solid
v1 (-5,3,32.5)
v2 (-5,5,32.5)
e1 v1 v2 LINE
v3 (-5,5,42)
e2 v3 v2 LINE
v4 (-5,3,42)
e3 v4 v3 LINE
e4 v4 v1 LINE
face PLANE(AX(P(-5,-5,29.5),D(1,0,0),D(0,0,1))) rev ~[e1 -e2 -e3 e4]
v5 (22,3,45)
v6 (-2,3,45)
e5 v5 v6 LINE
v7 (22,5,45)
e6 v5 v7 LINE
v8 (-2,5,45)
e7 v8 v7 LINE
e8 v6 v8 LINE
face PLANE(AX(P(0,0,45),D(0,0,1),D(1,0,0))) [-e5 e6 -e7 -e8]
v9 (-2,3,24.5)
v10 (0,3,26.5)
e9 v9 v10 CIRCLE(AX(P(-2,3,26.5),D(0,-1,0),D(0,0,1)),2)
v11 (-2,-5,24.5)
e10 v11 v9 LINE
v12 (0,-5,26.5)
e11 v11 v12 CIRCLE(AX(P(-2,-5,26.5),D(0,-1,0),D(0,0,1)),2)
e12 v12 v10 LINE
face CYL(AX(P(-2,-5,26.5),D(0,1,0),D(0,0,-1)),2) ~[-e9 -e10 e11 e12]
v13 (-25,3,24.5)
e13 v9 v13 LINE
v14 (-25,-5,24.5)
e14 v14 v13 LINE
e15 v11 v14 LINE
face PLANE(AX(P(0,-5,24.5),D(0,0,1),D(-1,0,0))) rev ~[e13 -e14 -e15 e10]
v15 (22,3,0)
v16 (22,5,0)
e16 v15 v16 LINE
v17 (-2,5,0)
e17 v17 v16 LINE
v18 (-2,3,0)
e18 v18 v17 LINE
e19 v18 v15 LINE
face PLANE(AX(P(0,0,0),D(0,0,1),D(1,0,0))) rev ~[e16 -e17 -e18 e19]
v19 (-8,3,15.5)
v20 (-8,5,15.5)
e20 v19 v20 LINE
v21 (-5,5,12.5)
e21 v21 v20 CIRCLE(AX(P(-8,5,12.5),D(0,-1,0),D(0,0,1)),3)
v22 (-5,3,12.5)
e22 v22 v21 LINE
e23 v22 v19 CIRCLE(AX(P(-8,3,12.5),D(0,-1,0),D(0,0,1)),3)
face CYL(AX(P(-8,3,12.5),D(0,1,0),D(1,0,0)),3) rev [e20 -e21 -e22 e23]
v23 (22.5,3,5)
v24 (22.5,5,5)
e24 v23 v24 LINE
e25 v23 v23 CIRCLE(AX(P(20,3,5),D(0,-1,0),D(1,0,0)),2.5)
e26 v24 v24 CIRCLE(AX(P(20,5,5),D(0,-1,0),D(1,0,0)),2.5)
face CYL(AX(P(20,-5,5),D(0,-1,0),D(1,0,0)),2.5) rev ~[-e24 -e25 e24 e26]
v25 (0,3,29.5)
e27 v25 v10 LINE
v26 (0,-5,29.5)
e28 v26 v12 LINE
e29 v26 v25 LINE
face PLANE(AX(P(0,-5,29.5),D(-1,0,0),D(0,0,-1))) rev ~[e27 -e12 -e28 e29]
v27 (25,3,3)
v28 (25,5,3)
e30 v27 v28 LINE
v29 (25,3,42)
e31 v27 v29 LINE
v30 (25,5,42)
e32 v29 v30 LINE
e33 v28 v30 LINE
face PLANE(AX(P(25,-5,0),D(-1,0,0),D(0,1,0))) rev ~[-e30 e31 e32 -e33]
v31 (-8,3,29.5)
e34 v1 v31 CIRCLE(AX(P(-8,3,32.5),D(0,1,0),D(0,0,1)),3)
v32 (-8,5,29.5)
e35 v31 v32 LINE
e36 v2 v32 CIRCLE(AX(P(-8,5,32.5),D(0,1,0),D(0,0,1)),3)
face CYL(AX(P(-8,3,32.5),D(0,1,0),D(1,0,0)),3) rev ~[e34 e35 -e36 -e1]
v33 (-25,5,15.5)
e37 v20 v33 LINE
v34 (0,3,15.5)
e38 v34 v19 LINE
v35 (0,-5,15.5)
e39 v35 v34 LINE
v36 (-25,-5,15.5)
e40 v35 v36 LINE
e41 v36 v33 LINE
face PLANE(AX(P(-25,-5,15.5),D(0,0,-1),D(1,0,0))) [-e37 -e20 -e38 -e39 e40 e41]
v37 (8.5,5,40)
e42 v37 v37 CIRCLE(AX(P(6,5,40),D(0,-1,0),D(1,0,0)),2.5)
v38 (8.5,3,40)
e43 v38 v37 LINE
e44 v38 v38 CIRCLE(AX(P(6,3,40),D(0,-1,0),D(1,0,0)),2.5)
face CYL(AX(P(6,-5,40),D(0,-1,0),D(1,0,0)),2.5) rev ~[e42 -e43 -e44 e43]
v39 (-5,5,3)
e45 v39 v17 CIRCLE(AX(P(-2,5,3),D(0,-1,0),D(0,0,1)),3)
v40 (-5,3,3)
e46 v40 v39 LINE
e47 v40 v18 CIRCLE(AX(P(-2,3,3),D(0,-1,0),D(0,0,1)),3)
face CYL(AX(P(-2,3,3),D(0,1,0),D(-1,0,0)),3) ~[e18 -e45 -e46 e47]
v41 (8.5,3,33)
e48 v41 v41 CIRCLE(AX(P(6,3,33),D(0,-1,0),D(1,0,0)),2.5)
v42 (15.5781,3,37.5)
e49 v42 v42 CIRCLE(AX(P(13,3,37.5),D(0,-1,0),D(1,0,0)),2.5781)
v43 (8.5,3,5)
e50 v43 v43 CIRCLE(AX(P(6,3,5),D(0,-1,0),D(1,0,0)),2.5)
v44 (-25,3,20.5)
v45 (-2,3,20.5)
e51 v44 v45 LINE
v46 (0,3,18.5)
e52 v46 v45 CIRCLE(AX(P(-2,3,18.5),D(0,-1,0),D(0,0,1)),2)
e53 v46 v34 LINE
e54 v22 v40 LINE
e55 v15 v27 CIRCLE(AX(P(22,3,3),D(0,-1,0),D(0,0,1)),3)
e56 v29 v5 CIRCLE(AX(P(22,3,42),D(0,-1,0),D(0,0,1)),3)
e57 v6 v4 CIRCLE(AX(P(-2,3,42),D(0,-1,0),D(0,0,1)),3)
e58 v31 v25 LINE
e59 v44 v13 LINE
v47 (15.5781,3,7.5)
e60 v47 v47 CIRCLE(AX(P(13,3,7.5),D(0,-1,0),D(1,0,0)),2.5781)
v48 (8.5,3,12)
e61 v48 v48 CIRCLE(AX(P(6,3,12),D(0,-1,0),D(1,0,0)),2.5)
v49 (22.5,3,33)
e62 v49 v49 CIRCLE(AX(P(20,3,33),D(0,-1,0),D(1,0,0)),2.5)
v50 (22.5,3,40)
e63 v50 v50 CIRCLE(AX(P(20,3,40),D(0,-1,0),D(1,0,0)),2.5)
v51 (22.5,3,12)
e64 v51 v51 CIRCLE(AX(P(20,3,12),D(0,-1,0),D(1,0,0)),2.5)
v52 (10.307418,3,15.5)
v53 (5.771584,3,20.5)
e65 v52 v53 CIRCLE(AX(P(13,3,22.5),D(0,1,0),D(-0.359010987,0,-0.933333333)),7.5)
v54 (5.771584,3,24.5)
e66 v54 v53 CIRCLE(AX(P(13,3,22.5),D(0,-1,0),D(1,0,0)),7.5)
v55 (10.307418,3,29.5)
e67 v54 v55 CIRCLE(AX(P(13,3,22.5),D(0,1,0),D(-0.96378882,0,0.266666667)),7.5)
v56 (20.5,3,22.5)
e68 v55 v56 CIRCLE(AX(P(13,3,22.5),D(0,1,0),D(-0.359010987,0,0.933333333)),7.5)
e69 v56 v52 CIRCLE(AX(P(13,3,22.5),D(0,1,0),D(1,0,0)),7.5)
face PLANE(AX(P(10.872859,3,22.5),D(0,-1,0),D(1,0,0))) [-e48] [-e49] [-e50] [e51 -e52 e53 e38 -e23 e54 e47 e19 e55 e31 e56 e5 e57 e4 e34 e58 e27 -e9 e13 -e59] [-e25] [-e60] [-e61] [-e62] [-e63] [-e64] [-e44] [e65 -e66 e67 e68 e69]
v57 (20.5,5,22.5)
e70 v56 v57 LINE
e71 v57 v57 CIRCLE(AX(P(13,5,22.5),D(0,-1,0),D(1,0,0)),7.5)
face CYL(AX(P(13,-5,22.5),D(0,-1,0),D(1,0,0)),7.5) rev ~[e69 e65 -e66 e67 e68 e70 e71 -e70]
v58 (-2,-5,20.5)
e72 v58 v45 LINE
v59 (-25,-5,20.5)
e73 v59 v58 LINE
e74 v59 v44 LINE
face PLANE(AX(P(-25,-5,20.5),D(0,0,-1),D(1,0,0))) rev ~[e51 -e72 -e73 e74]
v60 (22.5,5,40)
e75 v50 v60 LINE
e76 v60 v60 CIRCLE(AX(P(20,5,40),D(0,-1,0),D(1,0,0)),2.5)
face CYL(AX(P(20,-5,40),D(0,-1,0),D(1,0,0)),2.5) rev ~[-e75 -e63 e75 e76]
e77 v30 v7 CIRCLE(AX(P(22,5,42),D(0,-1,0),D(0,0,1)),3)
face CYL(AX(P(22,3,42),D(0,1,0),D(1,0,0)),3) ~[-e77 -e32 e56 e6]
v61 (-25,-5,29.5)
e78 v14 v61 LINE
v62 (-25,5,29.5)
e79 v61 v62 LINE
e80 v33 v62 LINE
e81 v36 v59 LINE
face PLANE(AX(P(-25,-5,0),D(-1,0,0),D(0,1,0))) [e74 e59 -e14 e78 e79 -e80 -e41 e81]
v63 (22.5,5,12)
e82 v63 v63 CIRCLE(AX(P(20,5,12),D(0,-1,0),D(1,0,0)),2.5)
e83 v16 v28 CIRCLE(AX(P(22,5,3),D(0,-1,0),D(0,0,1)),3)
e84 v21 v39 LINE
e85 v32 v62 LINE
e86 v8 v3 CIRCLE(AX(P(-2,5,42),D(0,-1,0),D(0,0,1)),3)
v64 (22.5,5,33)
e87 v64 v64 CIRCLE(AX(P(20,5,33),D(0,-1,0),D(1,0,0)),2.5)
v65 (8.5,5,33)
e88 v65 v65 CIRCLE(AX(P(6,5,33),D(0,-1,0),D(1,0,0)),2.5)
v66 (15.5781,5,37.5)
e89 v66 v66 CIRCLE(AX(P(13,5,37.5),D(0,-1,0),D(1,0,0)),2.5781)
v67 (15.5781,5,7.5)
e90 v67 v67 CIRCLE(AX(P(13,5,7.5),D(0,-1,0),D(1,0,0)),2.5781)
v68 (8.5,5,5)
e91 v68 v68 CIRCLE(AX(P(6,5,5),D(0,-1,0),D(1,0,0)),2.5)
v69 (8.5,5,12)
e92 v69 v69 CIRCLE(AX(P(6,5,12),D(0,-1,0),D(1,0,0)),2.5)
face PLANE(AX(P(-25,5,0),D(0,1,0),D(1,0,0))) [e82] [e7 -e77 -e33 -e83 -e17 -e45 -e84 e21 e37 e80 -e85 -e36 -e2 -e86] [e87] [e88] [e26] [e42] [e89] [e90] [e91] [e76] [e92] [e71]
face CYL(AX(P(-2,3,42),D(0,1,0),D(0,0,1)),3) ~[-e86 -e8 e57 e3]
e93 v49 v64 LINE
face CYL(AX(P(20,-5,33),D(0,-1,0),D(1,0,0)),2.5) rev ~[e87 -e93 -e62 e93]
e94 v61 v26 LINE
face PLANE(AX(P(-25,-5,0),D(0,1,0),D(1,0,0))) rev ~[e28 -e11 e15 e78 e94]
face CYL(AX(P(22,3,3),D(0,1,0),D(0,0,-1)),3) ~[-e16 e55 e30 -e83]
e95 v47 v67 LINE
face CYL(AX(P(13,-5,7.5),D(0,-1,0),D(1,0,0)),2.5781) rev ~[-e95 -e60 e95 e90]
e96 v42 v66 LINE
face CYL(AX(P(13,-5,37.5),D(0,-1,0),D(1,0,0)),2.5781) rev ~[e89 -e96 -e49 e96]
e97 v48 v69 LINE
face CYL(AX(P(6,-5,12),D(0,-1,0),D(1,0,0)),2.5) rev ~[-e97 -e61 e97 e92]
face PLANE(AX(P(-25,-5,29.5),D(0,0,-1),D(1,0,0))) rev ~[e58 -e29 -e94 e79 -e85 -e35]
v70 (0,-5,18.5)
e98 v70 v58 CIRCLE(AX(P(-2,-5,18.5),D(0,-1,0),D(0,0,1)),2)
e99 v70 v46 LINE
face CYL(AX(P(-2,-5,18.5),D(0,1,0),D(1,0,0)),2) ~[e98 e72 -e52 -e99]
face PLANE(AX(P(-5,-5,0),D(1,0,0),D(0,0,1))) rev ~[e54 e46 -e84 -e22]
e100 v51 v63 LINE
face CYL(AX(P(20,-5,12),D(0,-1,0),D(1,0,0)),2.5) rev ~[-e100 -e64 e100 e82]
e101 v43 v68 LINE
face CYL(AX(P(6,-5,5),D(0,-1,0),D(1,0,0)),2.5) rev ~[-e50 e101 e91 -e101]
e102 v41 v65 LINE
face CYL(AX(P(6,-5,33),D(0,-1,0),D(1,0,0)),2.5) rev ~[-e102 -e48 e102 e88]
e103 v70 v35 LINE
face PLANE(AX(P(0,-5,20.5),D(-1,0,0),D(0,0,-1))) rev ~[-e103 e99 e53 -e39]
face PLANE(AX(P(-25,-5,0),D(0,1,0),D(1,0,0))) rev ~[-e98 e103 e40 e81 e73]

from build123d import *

# Parameters (mm, degrees)
F0_W      = 50
F0_H      = 10
F1_DEPTH  = 45
F2_R      = 2.5781
F3_DEPTH  = 25
F4_R      = 7.5
F5_DEPTH  = 10.001
F6_R      = 2.5
F7_DEPTH  = 25
F8_W      = 20
F8_H      = 15.5
F9_DEPTH  = 25
F8_R      = 2.5
F8_R_2    = 2.5781
F8_W_2    = 25
F8_H_2    = 4
F10_DEPTH = 8
F11_R     = 3
F12_R     = 2


# Not quite as in the source:
# - a feature of the source that left no trace in its solid (it failed there, or was rolled back) is left out


with BuildPart() as f1:
    # F0 (on Top) → F1 (new body)
    with BuildSketch(Plane.XY):
        Rectangle(F0_W, F0_H)
    extrude(amount=F1_DEPTH)

    # F2 (on face) → F3 (cut)
    with BuildSketch(Plane.XZ.offset(5)):
        with Locations((13, 37.5)):
            Circle(F2_R)
        with Locations((13, 7.5)):
            Circle(F2_R)
    extrude(amount=-F3_DEPTH, mode=Mode.SUBTRACT)

    # F4 (on face) → F5 (cut, through all)
    with BuildSketch(Plane.XZ.offset(5)):
        with Locations((13, 22.5)):
            Circle(F4_R)
    extrude(amount=-F5_DEPTH, mode=Mode.SUBTRACT)

    # F6 (on face) → F7 (cut)
    with BuildSketch(Plane.XZ.offset(5)):
        with Locations((6, 5)):
            Circle(F6_R)
        with Locations((6, 40)):
            Circle(F6_R)
        with Locations((20, 5)):
            Circle(F6_R)
        with Locations((20, 40)):
            Circle(F6_R)
        with Locations((6, 12)):
            Circle(F6_R)
        with Locations((6, 33)):
            Circle(F6_R)
        with Locations((20, 12)):
            Circle(F6_R)
        with Locations((20, 33)):
            Circle(F6_R)
    extrude(amount=-F7_DEPTH, mode=Mode.SUBTRACT)

    # F8 (on face) → F9 (cut)
    with BuildSketch(Plane.XZ.offset(5)):
        with Locations((-15, 7.75)):
            Rectangle(F8_W, F8_H)
        with Locations((-15, 37.25)):
            Rectangle(F8_W, F8_H)
    extrude(amount=-F9_DEPTH, mode=Mode.SUBTRACT)

    # F8 (on face) → F10 (cut)
    with BuildSketch(Plane.XZ.offset(5)):
        with BuildLine():
            Line((-5, 29.5), (0, 29.5))
            Line((0, 29.5), (10.3074175964, 29.5))
            ThreePointArc((10.3074175964, 29.5), (17.2459175671, 28.6824092402), (20.5, 22.5))
            ThreePointArc((20.5, 22.5), (17.2459175671, 16.3175907598), (10.3074175964, 15.5))
            Line((10.3074175964, 15.5), (0, 15.5))
            Line((0, 15.5), (-5, 15.5))
            Line((-5, 15.5), (-5, 0))
            Line((-5, 0), (25, 0))
            Line((25, 0), (25, 45))
            Line((25, 45), (-5, 45))
            Line((-5, 45), (-5, 29.5))
        make_face()
        with Locations((6, 5)):
            Circle(F8_R, mode=Mode.SUBTRACT)
        with Locations((20, 5)):
            Circle(F8_R, mode=Mode.SUBTRACT)
        with Locations((13, 7.5)):
            Circle(F8_R_2, mode=Mode.SUBTRACT)
        with Locations((6, 12)):
            Circle(F8_R, mode=Mode.SUBTRACT)
        with Locations((20, 12)):
            Circle(F8_R, mode=Mode.SUBTRACT)
        with Locations((6, 33)):
            Circle(F8_R, mode=Mode.SUBTRACT)
        with Locations((20, 33)):
            Circle(F8_R, mode=Mode.SUBTRACT)
        with Locations((6, 40)):
            Circle(F8_R, mode=Mode.SUBTRACT)
        with Locations((13, 37.5)):
            Circle(F8_R_2, mode=Mode.SUBTRACT)
        with Locations((20, 40)):
            Circle(F8_R, mode=Mode.SUBTRACT)
        with Locations((-12.5, 22.5)):
            Rectangle(F8_W_2, F8_H_2)
        with BuildLine():
            Line((10.3074175964, 24.5), (5.7715838526, 24.5))
            ThreePointArc((5.7715838526, 24.5), (5.5, 22.5), (5.7715838526, 20.5))
            Line((5.7715838526, 20.5), (10.3074175964, 20.5))
            Line((10.3074175964, 20.5), (10.3074175964, 24.5))
        make_face()
        with BuildLine():
            Line((5.7715838526, 20.5), (0, 20.5))
            Line((0, 20.5), (0, 15.5))
            Line((0, 15.5), (10.3074175964, 15.5))
            ThreePointArc((10.3074175964, 15.5), (7.4451324892, 17.4608089004), (5.7715838526, 20.5))
        make_face()
        with BuildLine():
            Line((5.7715838526, 24.5), (0, 24.5))
            Line((0, 24.5), (0, 20.5))
            Line((0, 20.5), (5.7715838526, 20.5))
            ThreePointArc((5.7715838526, 20.5), (5.5, 22.5), (5.7715838526, 24.5))
        make_face()
        with BuildLine():
            Line((0, 29.5), (0, 24.5))
            Line((0, 24.5), (5.7715838526, 24.5))
            ThreePointArc((5.7715838526, 24.5), (7.4451324892, 27.5391910996), (10.3074175964, 29.5))
            Line((10.3074175964, 29.5), (0, 29.5))
        make_face()
    extrude(amount=-F10_DEPTH, mode=Mode.SUBTRACT)

    # F11
    f11_edges = [f1.edges().sort_by_distance(p)[0] for p in [
        (25, 4, 0),
        (25, 4, 45),
        (-5, 4, 45),
        (-5, 4, 29.5),
        (-5, 4, 0),
        (-5, 4, 15.5),
    ]]
    fillet(f11_edges, radius=F11_R)

    # F12
    f12_edges = [f1.edges().sort_by_distance(p)[0] for p in [
        (0, -1, 20.5),
        (0, -1, 24.5),
    ]]
    fillet(f12_edges, radius=F12_R)


solid = f1.part
